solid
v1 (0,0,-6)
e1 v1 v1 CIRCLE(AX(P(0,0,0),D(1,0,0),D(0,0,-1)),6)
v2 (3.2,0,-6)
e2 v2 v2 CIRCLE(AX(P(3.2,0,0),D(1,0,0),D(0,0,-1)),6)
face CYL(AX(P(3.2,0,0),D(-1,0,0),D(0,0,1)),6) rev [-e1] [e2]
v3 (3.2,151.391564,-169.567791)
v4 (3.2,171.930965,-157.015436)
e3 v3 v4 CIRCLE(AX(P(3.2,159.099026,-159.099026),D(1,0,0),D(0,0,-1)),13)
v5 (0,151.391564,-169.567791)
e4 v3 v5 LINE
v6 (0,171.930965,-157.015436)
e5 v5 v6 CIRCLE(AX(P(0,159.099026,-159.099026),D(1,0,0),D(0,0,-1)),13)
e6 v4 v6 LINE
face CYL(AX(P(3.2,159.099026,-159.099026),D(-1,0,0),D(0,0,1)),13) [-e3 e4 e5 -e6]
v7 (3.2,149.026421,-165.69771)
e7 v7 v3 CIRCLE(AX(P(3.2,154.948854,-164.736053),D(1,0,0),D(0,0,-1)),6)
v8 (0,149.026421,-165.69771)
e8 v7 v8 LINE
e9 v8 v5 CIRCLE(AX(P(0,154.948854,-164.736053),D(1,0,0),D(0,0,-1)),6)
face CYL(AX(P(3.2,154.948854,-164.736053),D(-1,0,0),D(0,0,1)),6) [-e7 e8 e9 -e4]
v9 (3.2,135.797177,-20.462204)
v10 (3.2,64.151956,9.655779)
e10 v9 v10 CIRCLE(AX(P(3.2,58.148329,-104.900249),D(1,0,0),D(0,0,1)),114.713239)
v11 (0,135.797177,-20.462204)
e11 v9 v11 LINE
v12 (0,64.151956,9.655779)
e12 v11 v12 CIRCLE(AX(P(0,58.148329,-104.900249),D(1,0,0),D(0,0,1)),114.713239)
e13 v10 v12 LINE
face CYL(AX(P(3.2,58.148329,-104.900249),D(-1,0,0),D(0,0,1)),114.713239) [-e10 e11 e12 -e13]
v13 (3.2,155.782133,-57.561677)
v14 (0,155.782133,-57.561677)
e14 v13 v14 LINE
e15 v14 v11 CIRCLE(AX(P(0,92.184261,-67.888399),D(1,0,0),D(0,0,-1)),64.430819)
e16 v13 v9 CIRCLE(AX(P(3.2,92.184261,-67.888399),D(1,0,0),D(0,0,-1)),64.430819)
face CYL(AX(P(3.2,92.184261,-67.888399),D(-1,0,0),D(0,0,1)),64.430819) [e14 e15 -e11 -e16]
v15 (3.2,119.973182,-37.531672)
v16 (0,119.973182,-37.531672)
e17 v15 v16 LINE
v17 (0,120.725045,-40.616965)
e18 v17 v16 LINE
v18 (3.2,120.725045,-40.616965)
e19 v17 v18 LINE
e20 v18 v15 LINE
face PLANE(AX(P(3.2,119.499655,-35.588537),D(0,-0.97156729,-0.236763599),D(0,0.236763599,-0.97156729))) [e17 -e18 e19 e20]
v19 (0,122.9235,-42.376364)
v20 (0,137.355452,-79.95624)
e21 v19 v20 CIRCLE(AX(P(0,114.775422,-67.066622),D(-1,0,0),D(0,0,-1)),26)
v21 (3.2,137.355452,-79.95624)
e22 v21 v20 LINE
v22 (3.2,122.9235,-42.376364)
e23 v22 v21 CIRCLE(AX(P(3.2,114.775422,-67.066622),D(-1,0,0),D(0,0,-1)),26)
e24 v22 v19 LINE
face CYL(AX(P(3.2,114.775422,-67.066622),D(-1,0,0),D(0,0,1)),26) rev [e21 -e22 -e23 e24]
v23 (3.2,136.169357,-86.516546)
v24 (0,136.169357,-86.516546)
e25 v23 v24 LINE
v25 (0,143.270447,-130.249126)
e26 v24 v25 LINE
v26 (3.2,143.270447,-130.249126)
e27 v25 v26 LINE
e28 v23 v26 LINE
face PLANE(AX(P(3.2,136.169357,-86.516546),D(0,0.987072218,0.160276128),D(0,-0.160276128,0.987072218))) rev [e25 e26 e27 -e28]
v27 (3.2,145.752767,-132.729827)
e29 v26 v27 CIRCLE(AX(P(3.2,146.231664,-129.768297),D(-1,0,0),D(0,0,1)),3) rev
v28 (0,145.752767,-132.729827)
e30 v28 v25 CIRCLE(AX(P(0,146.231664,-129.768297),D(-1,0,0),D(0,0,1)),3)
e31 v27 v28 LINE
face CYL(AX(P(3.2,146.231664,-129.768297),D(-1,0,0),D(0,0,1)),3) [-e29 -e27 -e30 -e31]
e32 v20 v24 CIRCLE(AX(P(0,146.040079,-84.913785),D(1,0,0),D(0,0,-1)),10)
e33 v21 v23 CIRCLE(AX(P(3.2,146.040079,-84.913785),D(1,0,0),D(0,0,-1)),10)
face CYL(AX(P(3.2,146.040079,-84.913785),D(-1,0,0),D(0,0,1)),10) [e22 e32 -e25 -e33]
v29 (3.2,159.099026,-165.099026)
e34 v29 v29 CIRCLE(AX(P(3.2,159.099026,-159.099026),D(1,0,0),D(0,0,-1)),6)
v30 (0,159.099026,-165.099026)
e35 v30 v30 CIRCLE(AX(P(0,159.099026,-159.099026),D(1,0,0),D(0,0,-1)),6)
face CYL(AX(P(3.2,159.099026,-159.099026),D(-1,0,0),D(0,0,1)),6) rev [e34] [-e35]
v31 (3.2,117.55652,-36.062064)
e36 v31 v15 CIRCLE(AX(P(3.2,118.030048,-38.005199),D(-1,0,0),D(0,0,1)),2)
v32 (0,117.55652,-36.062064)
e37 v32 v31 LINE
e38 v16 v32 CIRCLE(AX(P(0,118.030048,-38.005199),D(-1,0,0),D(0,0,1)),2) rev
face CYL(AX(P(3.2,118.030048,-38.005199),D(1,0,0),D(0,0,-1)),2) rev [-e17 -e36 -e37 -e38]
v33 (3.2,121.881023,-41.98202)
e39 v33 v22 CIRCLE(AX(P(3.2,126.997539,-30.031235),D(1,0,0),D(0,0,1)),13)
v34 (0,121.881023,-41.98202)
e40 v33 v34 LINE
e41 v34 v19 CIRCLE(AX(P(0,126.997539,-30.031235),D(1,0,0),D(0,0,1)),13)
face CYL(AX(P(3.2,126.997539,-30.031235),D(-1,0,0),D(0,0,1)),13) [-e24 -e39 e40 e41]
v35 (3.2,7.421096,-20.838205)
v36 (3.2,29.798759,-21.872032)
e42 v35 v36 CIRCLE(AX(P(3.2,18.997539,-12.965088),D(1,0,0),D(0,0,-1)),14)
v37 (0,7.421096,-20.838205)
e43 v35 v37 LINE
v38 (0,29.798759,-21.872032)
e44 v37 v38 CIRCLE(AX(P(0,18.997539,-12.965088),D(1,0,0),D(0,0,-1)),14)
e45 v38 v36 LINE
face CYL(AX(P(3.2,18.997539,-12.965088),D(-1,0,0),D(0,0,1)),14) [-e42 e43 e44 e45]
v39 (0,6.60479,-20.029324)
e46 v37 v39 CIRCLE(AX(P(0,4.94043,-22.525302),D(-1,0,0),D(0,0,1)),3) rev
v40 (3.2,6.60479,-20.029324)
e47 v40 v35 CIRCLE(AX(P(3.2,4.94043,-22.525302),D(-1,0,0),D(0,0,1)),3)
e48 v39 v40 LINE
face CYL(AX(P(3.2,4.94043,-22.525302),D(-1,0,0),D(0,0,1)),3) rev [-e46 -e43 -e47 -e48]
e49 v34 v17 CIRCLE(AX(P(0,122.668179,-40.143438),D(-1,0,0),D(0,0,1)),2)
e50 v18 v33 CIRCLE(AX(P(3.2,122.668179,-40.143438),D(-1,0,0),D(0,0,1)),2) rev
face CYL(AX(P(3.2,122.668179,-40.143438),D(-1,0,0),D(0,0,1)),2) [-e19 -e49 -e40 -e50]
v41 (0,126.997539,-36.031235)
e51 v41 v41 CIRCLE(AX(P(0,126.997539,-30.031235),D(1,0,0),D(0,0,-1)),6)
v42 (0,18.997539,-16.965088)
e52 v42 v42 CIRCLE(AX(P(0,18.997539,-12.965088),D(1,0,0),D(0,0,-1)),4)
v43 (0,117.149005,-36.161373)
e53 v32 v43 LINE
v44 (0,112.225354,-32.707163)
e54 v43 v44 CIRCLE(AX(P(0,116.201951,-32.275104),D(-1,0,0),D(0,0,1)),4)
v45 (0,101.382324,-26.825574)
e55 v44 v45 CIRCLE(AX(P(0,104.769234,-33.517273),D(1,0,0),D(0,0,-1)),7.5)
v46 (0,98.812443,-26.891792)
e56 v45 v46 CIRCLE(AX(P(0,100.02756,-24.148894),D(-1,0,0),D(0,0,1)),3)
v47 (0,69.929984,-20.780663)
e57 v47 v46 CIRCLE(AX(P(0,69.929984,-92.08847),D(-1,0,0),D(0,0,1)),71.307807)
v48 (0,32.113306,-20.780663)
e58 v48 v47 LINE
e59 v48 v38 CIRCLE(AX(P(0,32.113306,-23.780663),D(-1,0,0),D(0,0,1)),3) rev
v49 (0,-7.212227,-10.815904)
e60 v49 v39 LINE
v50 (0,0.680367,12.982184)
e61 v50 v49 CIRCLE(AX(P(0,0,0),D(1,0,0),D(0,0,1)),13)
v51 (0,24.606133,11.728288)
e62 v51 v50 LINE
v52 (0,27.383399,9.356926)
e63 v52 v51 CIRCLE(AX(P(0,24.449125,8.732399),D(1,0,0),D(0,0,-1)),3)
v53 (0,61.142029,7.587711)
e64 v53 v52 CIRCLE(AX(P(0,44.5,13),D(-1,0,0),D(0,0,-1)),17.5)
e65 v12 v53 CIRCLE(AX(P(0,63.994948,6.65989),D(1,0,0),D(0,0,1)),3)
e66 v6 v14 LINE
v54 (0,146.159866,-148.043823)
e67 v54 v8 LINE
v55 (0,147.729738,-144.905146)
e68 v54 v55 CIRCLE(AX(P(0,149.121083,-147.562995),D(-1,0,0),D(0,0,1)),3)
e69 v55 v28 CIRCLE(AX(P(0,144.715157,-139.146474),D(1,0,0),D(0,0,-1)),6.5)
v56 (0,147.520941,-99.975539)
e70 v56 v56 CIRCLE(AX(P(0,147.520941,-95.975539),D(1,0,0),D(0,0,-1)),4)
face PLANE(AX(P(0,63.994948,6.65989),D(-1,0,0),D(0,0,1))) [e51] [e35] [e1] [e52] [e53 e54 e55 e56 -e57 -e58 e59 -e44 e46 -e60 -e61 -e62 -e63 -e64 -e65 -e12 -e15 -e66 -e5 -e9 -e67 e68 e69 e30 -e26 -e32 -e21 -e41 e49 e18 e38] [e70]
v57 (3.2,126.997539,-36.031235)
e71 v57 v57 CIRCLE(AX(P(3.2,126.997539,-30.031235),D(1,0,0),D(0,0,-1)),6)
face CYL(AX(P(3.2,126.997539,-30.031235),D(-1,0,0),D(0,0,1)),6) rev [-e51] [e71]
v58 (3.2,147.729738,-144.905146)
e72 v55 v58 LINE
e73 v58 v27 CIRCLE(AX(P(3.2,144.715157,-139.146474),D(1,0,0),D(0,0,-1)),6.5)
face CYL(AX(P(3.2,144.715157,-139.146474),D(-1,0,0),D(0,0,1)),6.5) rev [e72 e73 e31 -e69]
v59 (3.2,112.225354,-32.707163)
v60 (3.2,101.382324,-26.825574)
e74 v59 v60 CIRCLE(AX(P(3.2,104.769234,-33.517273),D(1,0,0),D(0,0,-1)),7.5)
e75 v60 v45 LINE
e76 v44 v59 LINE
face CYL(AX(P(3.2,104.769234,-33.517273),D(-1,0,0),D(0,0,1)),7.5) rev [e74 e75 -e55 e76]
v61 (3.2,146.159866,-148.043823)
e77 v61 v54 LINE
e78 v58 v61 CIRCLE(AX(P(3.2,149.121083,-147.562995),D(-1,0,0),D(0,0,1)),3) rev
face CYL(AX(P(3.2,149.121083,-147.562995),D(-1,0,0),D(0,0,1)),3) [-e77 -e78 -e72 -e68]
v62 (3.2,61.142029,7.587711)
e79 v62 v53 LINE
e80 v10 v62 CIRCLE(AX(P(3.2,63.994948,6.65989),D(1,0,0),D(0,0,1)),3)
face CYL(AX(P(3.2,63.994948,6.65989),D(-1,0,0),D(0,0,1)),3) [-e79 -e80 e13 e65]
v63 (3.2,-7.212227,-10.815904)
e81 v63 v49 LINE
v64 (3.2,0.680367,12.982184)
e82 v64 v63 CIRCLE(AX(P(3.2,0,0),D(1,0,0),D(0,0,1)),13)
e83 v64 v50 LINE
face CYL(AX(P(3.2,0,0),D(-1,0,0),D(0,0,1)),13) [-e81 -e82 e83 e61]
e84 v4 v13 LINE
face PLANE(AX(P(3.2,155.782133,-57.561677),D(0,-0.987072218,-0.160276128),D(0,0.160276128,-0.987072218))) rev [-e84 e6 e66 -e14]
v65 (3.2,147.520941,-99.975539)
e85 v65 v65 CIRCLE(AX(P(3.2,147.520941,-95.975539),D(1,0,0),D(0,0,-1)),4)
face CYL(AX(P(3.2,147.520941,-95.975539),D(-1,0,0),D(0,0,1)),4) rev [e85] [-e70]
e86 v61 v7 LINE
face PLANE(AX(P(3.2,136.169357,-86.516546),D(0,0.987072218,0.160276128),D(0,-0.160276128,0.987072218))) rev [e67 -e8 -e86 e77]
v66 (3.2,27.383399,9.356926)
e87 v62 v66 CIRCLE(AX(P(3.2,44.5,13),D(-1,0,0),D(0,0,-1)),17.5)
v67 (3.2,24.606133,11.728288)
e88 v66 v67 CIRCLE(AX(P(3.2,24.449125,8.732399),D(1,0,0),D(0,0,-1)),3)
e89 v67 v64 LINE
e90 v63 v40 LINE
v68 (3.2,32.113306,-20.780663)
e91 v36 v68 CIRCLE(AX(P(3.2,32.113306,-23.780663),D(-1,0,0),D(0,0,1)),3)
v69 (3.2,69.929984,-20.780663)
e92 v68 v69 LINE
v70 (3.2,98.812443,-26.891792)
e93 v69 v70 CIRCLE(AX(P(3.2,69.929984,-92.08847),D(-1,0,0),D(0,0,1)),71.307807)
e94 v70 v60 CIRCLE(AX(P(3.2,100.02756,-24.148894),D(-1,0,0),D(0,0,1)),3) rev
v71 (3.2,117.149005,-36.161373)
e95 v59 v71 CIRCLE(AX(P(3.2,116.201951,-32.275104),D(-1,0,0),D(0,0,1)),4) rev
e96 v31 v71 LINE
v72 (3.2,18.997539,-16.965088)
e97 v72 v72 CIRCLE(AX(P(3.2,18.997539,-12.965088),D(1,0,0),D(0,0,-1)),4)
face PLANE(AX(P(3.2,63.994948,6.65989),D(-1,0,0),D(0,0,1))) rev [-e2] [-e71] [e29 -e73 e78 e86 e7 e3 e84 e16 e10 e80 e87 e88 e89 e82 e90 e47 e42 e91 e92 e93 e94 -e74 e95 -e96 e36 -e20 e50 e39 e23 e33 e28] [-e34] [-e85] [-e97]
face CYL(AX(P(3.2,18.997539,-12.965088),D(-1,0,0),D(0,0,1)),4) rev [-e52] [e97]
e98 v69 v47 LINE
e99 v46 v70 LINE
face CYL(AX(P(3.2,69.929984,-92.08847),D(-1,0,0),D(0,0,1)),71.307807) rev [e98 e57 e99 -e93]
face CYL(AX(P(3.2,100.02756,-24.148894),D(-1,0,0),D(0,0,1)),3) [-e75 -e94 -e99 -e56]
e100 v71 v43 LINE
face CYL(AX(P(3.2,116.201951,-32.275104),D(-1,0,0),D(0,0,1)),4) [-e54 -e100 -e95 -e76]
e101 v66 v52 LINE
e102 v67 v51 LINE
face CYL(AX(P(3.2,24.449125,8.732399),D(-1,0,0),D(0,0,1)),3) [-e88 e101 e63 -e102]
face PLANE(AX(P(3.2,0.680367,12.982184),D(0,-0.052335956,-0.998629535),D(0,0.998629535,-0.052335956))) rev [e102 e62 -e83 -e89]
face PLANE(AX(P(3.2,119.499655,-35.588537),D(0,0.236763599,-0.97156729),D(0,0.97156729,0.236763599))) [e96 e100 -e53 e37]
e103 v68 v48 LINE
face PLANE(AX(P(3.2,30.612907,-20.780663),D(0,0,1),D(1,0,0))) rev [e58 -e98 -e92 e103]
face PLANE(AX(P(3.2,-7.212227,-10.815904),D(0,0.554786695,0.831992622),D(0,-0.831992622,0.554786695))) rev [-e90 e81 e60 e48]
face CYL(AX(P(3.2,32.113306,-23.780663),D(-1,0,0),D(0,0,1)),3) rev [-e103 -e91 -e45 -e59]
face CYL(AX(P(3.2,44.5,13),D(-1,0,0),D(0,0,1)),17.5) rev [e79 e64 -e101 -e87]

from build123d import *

# Parameters (mm, degrees)
EXTRUDE1_DEPTH            = 3.2
SKETCH5_R                 = 6
CHASSIS_MOUNT_HOLES_DEPTH = 244.405812041
SKETCH6_R                 = 4
ENGINE_MOUNT_HOLES_DEPTH  = 244.405812041
SKETCH7_R                 = 6.5
SKETCH7_R_2               = 7.5
BOSS_CLEARANCE_DEPTH      = 244.405812041
FILLET1_R                 = 3
FILLET2_R                 = 2
FILLET4_R                 = 4


with BuildPart() as part:
    # Sketch4 → Extrude1 (new body)
    with BuildSketch(Plane(origin=(0, 0, 0), x_dir=(0, 0, -1), z_dir=(1, 0, 0))):
        with BuildLine():
            Line((57.561676807, 155.782132528), (157.015436102, 171.930964589))
            ThreePointArc((157.015436102, 171.930964589), (170.191569786, 165.878071941), (169.567790519, 151.39156416))
            ThreePointArc((169.567790519, 151.39156416), (167.864843482, 149.829218431), (165.697709708, 149.026420829))
            Line((165.697709708, 149.026420829), (86.516546247, 136.169357202))
            ThreePointArc((86.516546247, 136.169357202), (83.134642067, 136.199619503), (79.956239663, 137.355452467))
            ThreePointArc((79.956239663, 137.355452467), (57.745458436, 139.047132616), (42.376364081, 122.923500175))
            ThreePointArc((42.376364081, 122.923500175), (41.240179336, 120.412740542), (39.600266647, 118.197900576))
            ThreePointArc((39.600266647, 118.197900576), (25.651951648, 95.833503084), (20.780663371, 69.92998369))
            Line((20.780663371, 69.92998369), (20.780663371, 30.61290747))
            ThreePointArc((20.780663371, 30.61290747), (26.962955948, 18.753205297), (20.37053182, 7.116486634))
            Line((20.37053182, 7.116486634), (10.815904153, -7.21222708))
            ThreePointArc((10.815904153, -7.21222708), (-4.092243171, -12.339106447), (-12.982184032, 0.680367435))
            Line((-12.982184032, 0.680367435), (-11.728287792, 24.606132992))
            ThreePointArc((-11.728287792, 24.606132992), (-11.013879957, 26.397161442), (-9.356926136, 27.383399496))
            ThreePointArc((-9.356926136, 27.383399496), (4.476016858, 43.584120766), (-7.587711328, 61.142029063))
            ThreePointArc((-7.587711328, 61.142029063), (-9.132498235, 62.296063238), (-9.655779017, 64.1519562))
            ThreePointArc((-9.655779017, 64.1519562), (-0.849075896, 102.602883239), (20.462203873, 135.797177398))
            ThreePointArc((20.462203873, 135.797177398), (37.331902598, 148.908426775), (57.561676807, 155.782132528))
        make_face()
    extrude(amount=EXTRUDE1_DEPTH)

    # Sketch5 → chassis mount holes (cut, through all)
    with BuildSketch(Plane(origin=(0, 0, 0), x_dir=(0, 0, -1), z_dir=(1, 0, 0))):
        Circle(SKETCH5_R)
        with Locations((159.099025767, 159.099025767)):
            Circle(SKETCH5_R)
        with Locations((30.03123526, 126.997538987)):
            Circle(SKETCH5_R)
    extrude(amount=CHASSIS_MOUNT_HOLES_DEPTH, mode=Mode.SUBTRACT)

    # Sketch6 → engine mount holes (cut, through all)
    with BuildSketch(Plane(origin=(0, 0, 0), x_dir=(0, 0, -1), z_dir=(1, 0, 0))):
        with Locations((12.965088215, 18.997538987)):
            Circle(SKETCH6_R)
        with Locations((95.975539476, 147.520941453)):
            Circle(SKETCH6_R)
    extrude(amount=ENGINE_MOUNT_HOLES_DEPTH, mode=Mode.SUBTRACT)

    # Sketch7 → boss clearance (cut, through all)
    with BuildSketch(Plane(origin=(0, 0, 0), x_dir=(0, 0, -1), z_dir=(1, 0, 0))):
        with Locations((139.146474391, 144.715156547)):
            Circle(SKETCH7_R)
        with Locations((33.517273096, 104.769234054)):
            Circle(SKETCH7_R_2)
        Polygon((35.588537275, 119.499655), (44.876445881, 121.763048067), (36.718478427, 114.862903962), align=None)
    extrude(amount=BOSS_CLEARANCE_DEPTH, mode=Mode.SUBTRACT)

    # Fillet1
    fillet1_edges = [part.edges().sort_by_distance(p)[0] for p in [
        (1.6, 30.61290747, -20.780663371),
        (1.6, 7.116486634, -20.37053182),
        (1.6, 143.673361714, -132.730504977),
        (1.6, 145.75695138, -145.562443806),
        (1.6, 100.236921904, -27.541643708),
    ]]
    fillet(fillet1_edges, radius=FILLET1_R)

    # Fillet2
    fillet2_edges = [part.edges().sort_by_distance(p)[0] for p in [
        (1.6, 120.949682485, -41.538773206),
        (1.6, 119.499655, -35.588537275),
    ]]
    fillet(fillet2_edges, radius=FILLET2_R)

    # Fillet4
    fillet4_edges = [part.edges().sort_by_distance(p)[0] for p in [
        (1.6, 114.862903962, -36.718478427),
    ]]
    fillet(fillet4_edges, radius=FILLET4_R)
    fillet4_2_edges = [part.edges().sort_by_distance(p)[0] for p in [
        (1.6, 112.183550135, -34.647723026),
    ]]
    fillet(fillet4_2_edges, radius=FILLET4_R - 0.0001)  # a hair under: the kernel refuses the full size


solid = part.part
